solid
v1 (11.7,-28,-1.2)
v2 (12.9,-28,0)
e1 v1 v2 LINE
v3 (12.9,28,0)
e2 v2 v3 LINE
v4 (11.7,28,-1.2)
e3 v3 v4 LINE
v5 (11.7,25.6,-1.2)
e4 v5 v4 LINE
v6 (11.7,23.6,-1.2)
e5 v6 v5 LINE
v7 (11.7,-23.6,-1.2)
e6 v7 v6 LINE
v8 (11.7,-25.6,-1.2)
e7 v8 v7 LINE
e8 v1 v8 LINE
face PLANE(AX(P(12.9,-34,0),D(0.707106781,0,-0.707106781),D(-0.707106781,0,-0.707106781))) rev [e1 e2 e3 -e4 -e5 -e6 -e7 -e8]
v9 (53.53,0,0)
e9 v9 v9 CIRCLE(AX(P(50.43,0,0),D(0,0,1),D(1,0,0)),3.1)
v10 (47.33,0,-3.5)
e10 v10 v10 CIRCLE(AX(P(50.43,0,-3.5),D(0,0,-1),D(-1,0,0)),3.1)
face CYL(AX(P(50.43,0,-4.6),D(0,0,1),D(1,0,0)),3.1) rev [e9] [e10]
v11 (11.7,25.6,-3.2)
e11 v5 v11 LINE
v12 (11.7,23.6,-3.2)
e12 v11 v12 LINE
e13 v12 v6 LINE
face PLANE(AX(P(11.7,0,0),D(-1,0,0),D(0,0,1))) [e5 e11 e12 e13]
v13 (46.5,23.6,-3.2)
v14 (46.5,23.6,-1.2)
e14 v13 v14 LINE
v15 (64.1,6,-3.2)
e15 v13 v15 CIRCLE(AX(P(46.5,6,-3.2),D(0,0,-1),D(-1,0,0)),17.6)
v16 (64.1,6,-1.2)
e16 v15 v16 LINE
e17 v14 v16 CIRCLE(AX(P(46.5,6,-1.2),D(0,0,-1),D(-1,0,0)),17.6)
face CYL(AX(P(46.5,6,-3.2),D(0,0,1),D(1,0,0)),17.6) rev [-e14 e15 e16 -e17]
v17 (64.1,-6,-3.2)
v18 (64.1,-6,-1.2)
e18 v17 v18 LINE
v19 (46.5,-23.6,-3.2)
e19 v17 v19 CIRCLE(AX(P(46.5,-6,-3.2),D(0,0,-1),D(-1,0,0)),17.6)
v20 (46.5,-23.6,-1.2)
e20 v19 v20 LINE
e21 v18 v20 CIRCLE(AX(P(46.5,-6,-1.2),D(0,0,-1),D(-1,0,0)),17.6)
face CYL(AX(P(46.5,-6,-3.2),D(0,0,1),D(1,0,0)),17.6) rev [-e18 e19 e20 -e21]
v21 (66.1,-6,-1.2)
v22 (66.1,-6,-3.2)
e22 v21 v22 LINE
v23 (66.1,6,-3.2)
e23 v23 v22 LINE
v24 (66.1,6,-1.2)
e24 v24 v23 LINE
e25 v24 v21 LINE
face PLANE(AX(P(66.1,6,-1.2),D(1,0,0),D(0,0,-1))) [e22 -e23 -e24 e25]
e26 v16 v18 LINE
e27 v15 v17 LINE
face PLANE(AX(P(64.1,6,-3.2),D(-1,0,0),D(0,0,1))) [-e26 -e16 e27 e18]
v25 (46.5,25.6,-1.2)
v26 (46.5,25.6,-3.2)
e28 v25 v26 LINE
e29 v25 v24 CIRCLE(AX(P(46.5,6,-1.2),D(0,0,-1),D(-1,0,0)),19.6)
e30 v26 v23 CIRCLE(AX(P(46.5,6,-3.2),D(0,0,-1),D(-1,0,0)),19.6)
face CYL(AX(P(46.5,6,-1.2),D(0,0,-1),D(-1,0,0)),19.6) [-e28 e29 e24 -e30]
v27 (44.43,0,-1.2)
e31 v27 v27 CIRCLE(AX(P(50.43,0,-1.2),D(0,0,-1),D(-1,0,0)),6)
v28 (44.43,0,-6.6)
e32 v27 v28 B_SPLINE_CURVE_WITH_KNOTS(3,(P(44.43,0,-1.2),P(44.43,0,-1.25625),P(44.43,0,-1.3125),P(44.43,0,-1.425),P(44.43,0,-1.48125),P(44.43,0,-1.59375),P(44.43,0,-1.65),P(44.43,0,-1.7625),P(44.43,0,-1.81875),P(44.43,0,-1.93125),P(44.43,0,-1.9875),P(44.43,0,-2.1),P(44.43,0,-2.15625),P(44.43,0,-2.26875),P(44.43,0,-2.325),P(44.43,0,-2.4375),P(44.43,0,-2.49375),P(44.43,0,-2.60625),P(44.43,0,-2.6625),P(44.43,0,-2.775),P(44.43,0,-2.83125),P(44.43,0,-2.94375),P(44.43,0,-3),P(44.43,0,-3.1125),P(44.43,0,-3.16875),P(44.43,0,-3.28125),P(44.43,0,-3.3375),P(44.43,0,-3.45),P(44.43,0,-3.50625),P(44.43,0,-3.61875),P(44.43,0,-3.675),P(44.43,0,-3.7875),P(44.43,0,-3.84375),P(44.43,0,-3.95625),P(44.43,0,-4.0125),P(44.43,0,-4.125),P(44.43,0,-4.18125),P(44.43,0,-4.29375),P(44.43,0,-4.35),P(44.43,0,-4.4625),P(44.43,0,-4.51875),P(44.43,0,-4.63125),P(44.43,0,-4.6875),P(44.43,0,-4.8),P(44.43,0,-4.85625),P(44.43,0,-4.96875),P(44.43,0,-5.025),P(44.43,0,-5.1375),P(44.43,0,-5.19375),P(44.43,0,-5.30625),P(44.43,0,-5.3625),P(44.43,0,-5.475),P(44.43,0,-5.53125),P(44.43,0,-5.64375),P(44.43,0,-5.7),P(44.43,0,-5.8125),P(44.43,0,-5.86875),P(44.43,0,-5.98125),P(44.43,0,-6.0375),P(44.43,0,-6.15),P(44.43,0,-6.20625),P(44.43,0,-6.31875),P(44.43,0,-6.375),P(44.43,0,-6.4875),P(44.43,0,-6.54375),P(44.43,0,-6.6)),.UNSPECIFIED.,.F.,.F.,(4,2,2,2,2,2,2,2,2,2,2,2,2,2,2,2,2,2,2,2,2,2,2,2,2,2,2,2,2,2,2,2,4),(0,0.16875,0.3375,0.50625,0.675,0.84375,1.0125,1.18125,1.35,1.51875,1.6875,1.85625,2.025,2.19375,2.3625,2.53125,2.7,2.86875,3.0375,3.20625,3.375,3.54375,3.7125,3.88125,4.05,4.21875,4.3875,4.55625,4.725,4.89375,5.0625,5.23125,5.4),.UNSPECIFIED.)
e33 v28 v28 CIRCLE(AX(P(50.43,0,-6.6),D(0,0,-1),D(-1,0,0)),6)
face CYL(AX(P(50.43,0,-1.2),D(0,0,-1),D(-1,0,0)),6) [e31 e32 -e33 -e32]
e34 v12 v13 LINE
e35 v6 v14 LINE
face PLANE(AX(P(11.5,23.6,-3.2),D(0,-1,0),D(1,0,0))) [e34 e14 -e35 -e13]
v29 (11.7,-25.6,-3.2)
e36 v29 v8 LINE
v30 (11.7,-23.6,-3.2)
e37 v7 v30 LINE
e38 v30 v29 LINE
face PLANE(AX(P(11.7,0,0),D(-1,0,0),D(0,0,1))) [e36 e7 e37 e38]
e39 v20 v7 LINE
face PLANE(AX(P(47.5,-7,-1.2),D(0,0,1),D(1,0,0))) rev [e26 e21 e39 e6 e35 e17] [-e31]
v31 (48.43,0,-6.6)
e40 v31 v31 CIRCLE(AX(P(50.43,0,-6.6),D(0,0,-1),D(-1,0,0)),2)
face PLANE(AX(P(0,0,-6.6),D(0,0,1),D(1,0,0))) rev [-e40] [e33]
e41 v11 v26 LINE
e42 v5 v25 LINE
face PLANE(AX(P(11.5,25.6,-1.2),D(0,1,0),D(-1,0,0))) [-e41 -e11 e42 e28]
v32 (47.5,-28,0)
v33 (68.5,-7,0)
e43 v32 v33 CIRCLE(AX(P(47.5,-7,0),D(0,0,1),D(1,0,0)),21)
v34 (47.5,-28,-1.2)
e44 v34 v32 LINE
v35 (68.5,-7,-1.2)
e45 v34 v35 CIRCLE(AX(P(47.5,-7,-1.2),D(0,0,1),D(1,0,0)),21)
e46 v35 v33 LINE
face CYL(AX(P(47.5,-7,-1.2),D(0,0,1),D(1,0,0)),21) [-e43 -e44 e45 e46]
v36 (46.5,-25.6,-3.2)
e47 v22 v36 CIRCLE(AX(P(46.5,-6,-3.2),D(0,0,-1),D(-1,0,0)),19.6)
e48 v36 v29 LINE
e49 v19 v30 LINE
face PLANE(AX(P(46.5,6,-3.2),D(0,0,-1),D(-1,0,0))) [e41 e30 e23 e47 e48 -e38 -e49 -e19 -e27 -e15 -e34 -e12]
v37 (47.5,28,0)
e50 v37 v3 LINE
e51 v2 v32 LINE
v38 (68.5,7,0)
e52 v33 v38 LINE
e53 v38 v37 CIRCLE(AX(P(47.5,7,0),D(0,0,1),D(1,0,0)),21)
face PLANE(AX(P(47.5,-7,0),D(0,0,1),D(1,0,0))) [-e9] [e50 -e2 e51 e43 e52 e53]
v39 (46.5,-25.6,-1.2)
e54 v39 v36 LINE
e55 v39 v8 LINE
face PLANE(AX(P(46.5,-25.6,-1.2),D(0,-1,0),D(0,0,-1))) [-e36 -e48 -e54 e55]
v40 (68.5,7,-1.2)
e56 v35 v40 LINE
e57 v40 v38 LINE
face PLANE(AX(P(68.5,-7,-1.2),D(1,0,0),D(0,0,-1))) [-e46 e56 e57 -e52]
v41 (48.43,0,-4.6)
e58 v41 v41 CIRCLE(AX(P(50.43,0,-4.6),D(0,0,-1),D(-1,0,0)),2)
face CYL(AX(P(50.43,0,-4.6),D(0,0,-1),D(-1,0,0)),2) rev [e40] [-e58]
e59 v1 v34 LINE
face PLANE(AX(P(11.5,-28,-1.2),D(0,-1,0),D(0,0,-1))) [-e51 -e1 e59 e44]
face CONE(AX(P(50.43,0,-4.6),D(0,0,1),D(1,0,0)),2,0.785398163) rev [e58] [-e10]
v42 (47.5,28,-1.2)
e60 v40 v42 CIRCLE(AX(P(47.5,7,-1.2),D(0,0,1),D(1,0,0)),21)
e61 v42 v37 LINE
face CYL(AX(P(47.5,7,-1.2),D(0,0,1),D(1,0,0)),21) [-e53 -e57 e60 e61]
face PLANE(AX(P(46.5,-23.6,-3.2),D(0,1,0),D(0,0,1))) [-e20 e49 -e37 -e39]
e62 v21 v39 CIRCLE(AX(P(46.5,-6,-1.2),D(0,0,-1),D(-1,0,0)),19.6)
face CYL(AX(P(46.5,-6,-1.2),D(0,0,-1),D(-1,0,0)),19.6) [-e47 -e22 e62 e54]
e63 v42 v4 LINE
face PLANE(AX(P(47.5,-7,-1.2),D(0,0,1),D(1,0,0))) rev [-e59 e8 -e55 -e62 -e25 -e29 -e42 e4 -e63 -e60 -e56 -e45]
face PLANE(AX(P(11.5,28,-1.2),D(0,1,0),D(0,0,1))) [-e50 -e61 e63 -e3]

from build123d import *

# Parameters (mm, degrees)
SKETCH_2_R            = 2.6
EXTRUDE_1_DEPTH       = 1.2
EXTRUDE_1_2_DEPTH     = 2
CUT_EXTRUDE_START     = -2
CUT_EXTRUDE_1_DEPTH   = 2
SKETCH_7_W            = 2
SKETCH_7_H            = 51.2
EXTRUDE_2_DEPTH       = 0.4
SKETCH_8_W            = 2.4
SKETCH_8_H            = 47.2
CUT_EXTRUDE_1_2_DEPTH = 2
CUT_EXTRUDE_2_DEPTH   = 62
SKETCH_10_W           = 2
SKETCH_10_H           = 2
CUT_EXTRUDE_3_DEPTH   = 0.2
SKETCH_11_W           = 14.43
SKETCH_11_H           = 14
SKETCH_11_R           = 2.6
EXTRUDE_3_DEPTH       = 5.4
SKETCH_12_R           = 3
SKETCH_12_R_2         = 2
EXTRUDE_2_2_DEPTH     = 2
SKETCH_13_R           = 3.1
CUT_EXTRUDE_4_DEPTH   = 4.6
CHAMFER_1_SIZE        = 1.1
SKETCH_14_R           = 11
SKETCH_14_R_2         = 6
CUT_EXTRUDE_2_2_DEPTH = 5.4


with BuildPart() as part:
    # Эскиз2 → Extrude 1 (new body)
    with BuildSketch(Plane.XY):
        with BuildLine():
            Line((68.5, -7), (68.5, 7))
            ThreePointArc((68.5, 7), (62.349242405, 21.849242405), (47.5, 28))
            Line((47.5, 28), (11.5, 28))
            Line((11.5, 28), (11.5, -28))
            Line((11.5, -28), (47.5, -28))
            ThreePointArc((47.5, -28), (62.349242405, -21.849242405), (68.5, -7))
        make_face()
        with Locations((50.43, 0)):
            Circle(SKETCH_2_R, mode=Mode.SUBTRACT)
    extrude(amount=-EXTRUDE_1_DEPTH)

    # Эскиз3 → Extrude 1 2 (add)
    with BuildSketch(Plane(origin=(0, 0, -1.2), x_dir=(-1, 0, 0), z_dir=(0, 0, -1))):
        with BuildLine():
            Line((-46.5, -26), (-11.5, -26))
            Line((-11.5, -26), (-11.5, 26))
            Line((-11.5, 26), (-46.5, 26))
            ThreePointArc((-46.5, 26), (-60.642135624, 20.142135624), (-66.5, 6))
            Line((-66.5, 6), (-66.5, -6))
            ThreePointArc((-66.5, -6), (-60.642135624, -20.142135624), (-46.5, -26))
        make_face()
        with BuildLine():
            Line((-46.5, -23.6), (-13.9, -23.6))
            Line((-13.9, -23.6), (-13.9, 23.6))
            Line((-13.9, 23.6), (-46.5, 23.6))
            ThreePointArc((-46.5, 23.6), (-58.945079349, 18.445079349), (-64.1, 6))
            Line((-64.1, 6), (-64.1, -6))
            ThreePointArc((-64.1, -6), (-58.945079349, -18.445079349), (-46.5, -23.6))
        make_face(mode=Mode.SUBTRACT)
    extrude(amount=EXTRUDE_1_2_DEPTH)

    # Эскиз4 → Cut-Extrude 1 (cut)
    with BuildSketch(Plane(origin=(0, 0, -3.2), x_dir=(-1, 0, 0), z_dir=(0, 0, -1)).offset(CUT_EXTRUDE_START)):
        with BuildLine():
            Line((-66.5, 6), (-66.5, -6))
            ThreePointArc((-66.5, -6), (-60.642135624, -20.142135624), (-46.5, -26))
            Line((-46.5, -26), (-11.5, -26))
            Line((-11.5, -26), (-11.5, 26))
            Line((-11.5, 26), (-46.5, 26))
            ThreePointArc((-46.5, 26), (-60.642135624, 20.142135624), (-66.5, 6))
        make_face()
        with BuildLine():
            Line((-66.1, 6), (-66.1, -6))
            ThreePointArc((-66.1, -6), (-60.359292911, -19.859292911), (-46.5, -25.6))
            Line((-46.5, -25.6), (-11.9, -25.6))
            Line((-11.9, -25.6), (-11.9, 25.6))
            Line((-11.9, 25.6), (-46.5, 25.6))
            ThreePointArc((-46.5, 25.6), (-60.359292911, 19.859292911), (-66.1, 6))
        make_face(mode=Mode.SUBTRACT)
    extrude(amount=CUT_EXTRUDE_1_DEPTH, mode=Mode.SUBTRACT)

    # Эскиз7 → Extrude 2 (add)
    with BuildSketch(Plane.ZY.offset(-11.9)):
        with Locations((-2.2, 0)):
            Rectangle(SKETCH_7_W, SKETCH_7_H)
    extrude(amount=EXTRUDE_2_DEPTH)

    # Эскиз8 → Cut-Extrude 1 2 (cut)
    with BuildSketch(Plane(origin=(0, 0, -3.2), x_dir=(-1, 0, 0), z_dir=(0, 0, -1))):
        with Locations((-12.7, 0)):
            Rectangle(SKETCH_8_W, SKETCH_8_H)
    extrude(amount=-CUT_EXTRUDE_1_2_DEPTH, mode=Mode.SUBTRACT)

    # Эскиз9 → Cut-Extrude 2 (cut)
    with BuildSketch(Plane(origin=(0, 28, 0), x_dir=(1, 0, 0), z_dir=(0, 1, 0))):
        Polygon((11.5, 0), (12.9, 0), (11.7, 1.2), (11.5, 1.2), align=None)
    extrude(amount=-CUT_EXTRUDE_2_DEPTH, mode=Mode.SUBTRACT)

    # Эскиз10 → Вырез-Вытянуть3 (cut)
    with BuildSketch(Plane.ZY.offset(-11.5)):
        with Locations((-2.2, 24.6)):
            Rectangle(SKETCH_10_W, SKETCH_10_H)
        with Locations((-2.2, -24.6)):
            Rectangle(SKETCH_10_W, SKETCH_10_H)
    extrude(amount=-CUT_EXTRUDE_3_DEPTH, mode=Mode.SUBTRACT)

    # Эскиз11 → Бобышка-Вытянуть3 (add)
    with BuildSketch(Plane(origin=(0, 0, -1.2), x_dir=(-1, 0, 0), z_dir=(0, 0, -1))):
        with Locations((-50.215, 0)):
            Rectangle(SKETCH_11_W, SKETCH_11_H)
        with Locations(Location((-50.43, 0, 0), (0, 0, 180))):
            Circle(SKETCH_11_R, mode=Mode.SUBTRACT)
    extrude(amount=EXTRUDE_3_DEPTH)

    # Эскиз12 → Extrude 2 2 (add)
    with BuildSketch(Plane(origin=(0, 0, -6.6), x_dir=(-1, 0, 0), z_dir=(0, 0, -1))):
        with Locations((-50.43, 0)):
            Circle(SKETCH_12_R)
        with Locations((-50.43, 0)):
            Circle(SKETCH_12_R_2, mode=Mode.SUBTRACT)
    extrude(amount=-EXTRUDE_2_2_DEPTH)

    # Эскиз13 → Вырез-Вытянуть4 (cut)
    with BuildSketch(Plane.XY):
        with Locations((50.43, 0)):
            Circle(SKETCH_13_R)
    extrude(amount=-CUT_EXTRUDE_4_DEPTH, mode=Mode.SUBTRACT)

    # Фаска1
    chamfer_1_edges = [part.edges().sort_by_distance(p)[0] for p in [
        (47.33, 0, -4.6),
    ]]
    chamfer(chamfer_1_edges, length=CHAMFER_1_SIZE - 0.0001)  # a hair under: the kernel refuses the full size

    # Эскиз14 → Cut-Extrude 2 2 (cut)
    with BuildSketch(Plane(origin=(0, 0, -6.6), x_dir=(-1, 0, 0), z_dir=(0, 0, -1))):
        with Locations((-50.43, 0)):
            Circle(SKETCH_14_R)
        with Locations((-50.43, 0)):
            Circle(SKETCH_14_R_2, mode=Mode.SUBTRACT)
    extrude(amount=-CUT_EXTRUDE_2_2_DEPTH, mode=Mode.SUBTRACT)


solid = part.part
